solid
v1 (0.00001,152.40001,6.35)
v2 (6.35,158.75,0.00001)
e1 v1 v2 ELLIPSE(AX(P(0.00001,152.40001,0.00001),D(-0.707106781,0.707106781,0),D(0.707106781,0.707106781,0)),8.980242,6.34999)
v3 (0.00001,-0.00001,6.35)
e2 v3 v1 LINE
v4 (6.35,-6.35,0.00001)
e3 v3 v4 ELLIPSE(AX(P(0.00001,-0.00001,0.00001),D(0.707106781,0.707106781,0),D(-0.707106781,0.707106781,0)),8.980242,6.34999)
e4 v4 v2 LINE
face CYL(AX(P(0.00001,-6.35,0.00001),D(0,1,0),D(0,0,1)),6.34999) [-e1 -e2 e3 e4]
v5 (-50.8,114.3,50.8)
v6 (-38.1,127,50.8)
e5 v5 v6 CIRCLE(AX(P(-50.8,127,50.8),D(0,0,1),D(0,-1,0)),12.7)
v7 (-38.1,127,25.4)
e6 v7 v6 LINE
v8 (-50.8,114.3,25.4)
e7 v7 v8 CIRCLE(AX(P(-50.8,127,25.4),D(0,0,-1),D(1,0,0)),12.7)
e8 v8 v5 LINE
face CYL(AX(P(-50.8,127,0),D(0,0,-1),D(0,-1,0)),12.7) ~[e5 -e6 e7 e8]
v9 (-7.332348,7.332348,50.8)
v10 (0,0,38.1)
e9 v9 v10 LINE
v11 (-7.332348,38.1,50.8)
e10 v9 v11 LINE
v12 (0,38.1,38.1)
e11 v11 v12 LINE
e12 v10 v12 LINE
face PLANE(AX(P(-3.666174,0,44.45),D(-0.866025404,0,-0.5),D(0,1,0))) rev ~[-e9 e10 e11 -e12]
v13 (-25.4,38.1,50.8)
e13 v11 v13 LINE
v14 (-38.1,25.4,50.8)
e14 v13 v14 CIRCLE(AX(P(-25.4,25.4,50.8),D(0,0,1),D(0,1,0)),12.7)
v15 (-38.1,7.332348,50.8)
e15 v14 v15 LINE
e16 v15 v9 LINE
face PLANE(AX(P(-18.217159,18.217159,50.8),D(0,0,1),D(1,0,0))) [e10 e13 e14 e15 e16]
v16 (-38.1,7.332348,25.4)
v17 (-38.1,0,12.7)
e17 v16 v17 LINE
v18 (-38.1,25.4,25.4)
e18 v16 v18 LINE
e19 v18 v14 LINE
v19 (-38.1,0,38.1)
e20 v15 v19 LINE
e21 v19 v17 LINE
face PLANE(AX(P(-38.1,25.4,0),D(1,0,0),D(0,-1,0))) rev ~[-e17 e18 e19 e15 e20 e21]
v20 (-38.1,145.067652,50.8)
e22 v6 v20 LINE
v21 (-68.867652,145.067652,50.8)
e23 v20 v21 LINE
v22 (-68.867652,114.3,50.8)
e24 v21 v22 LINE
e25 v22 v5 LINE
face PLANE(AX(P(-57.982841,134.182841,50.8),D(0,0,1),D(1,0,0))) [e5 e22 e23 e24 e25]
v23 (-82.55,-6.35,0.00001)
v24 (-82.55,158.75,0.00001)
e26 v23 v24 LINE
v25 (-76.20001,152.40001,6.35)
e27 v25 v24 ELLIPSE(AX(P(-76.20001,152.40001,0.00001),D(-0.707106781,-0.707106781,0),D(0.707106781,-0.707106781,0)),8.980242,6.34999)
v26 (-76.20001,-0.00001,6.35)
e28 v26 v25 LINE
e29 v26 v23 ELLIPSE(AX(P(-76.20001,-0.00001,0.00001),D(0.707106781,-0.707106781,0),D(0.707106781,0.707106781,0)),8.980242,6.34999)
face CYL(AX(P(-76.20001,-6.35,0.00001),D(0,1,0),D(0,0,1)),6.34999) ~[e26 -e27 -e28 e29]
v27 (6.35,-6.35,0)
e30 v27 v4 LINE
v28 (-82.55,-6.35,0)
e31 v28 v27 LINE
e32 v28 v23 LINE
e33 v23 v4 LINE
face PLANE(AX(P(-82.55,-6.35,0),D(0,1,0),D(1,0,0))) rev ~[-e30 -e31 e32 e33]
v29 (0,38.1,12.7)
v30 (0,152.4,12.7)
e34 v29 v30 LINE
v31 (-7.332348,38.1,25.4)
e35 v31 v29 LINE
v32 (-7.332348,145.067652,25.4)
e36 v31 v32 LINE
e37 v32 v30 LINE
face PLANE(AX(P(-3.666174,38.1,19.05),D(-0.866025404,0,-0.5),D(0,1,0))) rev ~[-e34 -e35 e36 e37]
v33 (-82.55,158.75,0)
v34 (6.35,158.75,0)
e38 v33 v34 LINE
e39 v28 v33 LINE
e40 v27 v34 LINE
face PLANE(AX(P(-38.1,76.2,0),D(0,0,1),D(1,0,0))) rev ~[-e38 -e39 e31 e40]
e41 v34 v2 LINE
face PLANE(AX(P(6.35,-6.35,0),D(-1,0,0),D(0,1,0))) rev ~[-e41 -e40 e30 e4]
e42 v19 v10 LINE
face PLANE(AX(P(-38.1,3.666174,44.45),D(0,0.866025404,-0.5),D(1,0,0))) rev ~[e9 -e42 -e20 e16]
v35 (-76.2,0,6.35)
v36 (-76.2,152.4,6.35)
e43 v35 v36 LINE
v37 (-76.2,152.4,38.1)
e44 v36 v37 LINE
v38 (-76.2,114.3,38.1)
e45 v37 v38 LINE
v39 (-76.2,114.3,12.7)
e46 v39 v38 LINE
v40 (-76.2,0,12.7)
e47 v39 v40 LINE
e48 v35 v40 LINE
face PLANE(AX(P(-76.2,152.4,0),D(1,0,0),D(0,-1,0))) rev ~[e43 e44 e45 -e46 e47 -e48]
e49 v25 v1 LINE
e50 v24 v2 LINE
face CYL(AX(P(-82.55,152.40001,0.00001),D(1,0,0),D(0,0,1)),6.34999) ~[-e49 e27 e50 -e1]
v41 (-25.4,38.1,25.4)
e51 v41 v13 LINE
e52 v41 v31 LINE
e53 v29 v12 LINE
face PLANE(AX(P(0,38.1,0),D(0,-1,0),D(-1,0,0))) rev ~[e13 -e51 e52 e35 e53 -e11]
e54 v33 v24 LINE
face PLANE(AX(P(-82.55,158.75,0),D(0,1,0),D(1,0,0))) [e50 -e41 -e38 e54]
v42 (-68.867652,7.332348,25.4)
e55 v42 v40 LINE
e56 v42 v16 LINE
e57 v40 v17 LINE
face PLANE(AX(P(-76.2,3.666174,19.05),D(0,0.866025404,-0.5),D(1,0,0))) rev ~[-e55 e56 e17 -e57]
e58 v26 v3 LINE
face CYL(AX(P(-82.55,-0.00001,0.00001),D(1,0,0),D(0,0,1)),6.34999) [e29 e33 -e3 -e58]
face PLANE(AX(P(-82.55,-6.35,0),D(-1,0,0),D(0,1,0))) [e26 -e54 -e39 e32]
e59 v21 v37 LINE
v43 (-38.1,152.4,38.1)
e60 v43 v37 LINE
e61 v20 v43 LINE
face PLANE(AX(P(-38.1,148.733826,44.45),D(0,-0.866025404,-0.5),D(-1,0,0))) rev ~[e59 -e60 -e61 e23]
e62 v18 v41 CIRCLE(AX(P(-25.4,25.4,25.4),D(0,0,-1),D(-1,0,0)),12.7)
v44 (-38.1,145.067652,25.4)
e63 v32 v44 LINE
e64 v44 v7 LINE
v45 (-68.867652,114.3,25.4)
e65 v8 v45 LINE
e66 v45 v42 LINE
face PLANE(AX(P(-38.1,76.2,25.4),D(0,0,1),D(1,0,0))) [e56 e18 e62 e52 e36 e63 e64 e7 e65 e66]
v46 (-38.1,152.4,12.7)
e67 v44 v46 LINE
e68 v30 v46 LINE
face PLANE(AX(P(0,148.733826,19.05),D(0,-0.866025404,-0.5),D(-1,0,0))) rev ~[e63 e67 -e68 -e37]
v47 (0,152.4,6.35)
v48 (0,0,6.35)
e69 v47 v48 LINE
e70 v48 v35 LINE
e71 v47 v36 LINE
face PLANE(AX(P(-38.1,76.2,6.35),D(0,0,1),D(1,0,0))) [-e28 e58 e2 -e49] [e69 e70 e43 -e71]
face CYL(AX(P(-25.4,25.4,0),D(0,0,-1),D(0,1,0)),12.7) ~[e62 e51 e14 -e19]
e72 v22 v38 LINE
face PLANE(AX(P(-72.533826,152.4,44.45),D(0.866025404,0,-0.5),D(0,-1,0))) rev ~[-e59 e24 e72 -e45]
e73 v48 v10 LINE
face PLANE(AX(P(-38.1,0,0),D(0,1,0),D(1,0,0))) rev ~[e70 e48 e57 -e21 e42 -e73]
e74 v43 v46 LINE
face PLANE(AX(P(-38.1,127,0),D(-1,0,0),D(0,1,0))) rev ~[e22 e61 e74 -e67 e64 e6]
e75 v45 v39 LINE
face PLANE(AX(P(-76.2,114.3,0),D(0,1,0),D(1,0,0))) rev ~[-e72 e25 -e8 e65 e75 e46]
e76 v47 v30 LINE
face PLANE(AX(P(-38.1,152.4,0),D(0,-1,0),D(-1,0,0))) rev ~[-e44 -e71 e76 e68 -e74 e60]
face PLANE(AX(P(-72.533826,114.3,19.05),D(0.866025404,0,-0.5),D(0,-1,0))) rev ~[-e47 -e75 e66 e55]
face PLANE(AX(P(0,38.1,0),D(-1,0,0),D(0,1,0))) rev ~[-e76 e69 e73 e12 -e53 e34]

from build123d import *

# Parameters (mm, degrees)
F0_W     = 88.9
F0_H     = 165.1
F1_DEPTH = 6.35
F2_DEPTH = 25.4
F3_DEPTH = 50.8
F4_R     = 6.34999
F5_SIZE2 = 12.7
F5_SIZE  = 7.3323484187
F6_SIZE2 = 12.7
F6_SIZE  = 7.3323484187
F7_SIZE2 = 12.7
F7_SIZE  = 7.3323484187


# Not quite as in the source:
# - a fillet or chamfer is up to 0.001 mm smaller than in the source, because OpenCascade refuses the exact size


with BuildPart() as f1:
    # F0 (on Top) → F1 (new body)
    with BuildSketch(Plane.XY):
        with Locations((-38.1, 76.2)):
            Rectangle(F0_W, F0_H)
        Polygon((-76.2, 114.3), (-76.2, 152.4), (-38.1, 152.4), (0, 152.4), (0, 38.1), (0, 0), (-38.1, 0), (-76.2, 0), align=None, mode=Mode.SUBTRACT)
    extrude(amount=F1_DEPTH)

    # F0 (on Top) → F2 (join)
    with BuildSketch(Plane.XY):
        with BuildLine():
            Line((0, 152.4), (-38.1, 152.4))
            Line((-38.1, 152.4), (-38.1, 127))
            ThreePointArc((-38.1, 127), (-41.8197438789, 118.0197438789), (-50.8, 114.3))
            Line((-50.8, 114.3), (-76.2, 114.3))
            Line((-76.2, 114.3), (-76.2, 0))
            Line((-76.2, 0), (-38.1, 0))
            Line((-38.1, 0), (-38.1, 25.4))
            ThreePointArc((-38.1, 25.4), (-34.3802561211, 34.3802561211), (-25.4, 38.1))
            Line((-25.4, 38.1), (0, 38.1))
            Line((0, 38.1), (0, 152.4))
        make_face()
    extrude(amount=F2_DEPTH)

    # F0 (on Top) → F3 (join)
    with BuildSketch(Plane.XY):
        with BuildLine():
            Line((-38.1, 152.4), (-76.2, 152.4))
            Line((-76.2, 152.4), (-76.2, 114.3))
            Line((-76.2, 114.3), (-50.8, 114.3))
            ThreePointArc((-50.8, 114.3), (-41.8197438789, 118.0197438789), (-38.1, 127))
            Line((-38.1, 127), (-38.1, 152.4))
        make_face()
        with BuildLine():
            Line((0, 0), (0, 38.1))
            Line((0, 38.1), (-25.4, 38.1))
            ThreePointArc((-25.4, 38.1), (-34.3802561211, 34.3802561211), (-38.1, 25.4))
            Line((-38.1, 25.4), (-38.1, 0))
            Line((-38.1, 0), (0, 0))
        make_face()
    extrude(amount=F3_DEPTH)

    # F4 (radius 6.35 in the source; OpenCascade refuses exactly that, so slightly less here)
    f4_edges = [f1.edges().sort_by_distance(p)[0] for p in [
        (6.35, 76.2, 6.35),
        (-38.1, 158.75, 6.35),
        (-82.55, 76.2, 6.35),
        (-38.1, -6.35, 6.35),
    ]]
    fillet(f4_edges, radius=F4_R)

    # F5
    f5_edges = [f1.edges().sort_by_distance(p)[0] for p in [
        (0, 95.25, 25.4),
        (-57.15, 0, 25.4),
        (-76.2, 57.15, 25.4),
        (-19.05, 152.4, 25.4),
    ]]
    f5_side = f1.faces().sort_by_distance((-38.1, 76.2, 25.4))[0]
    chamfer(f5_edges, length=F5_SIZE, length2=F5_SIZE2, reference=f5_side)

    # F6
    f6_edges = [f1.edges().sort_by_distance(p)[0] for p in [
        (-57.15, 152.4, 50.8),
        (-76.2, 133.35, 50.8),
    ]]
    f6_side = f1.faces().sort_by_distance((-57.546042, 133.746042, 50.8))[0]
    chamfer(f6_edges, length=F6_SIZE, length2=F6_SIZE2, reference=f6_side)

    # F7
    f7_edges = [f1.edges().sort_by_distance(p)[0] for p in [
        (0, 19.05, 50.8),
        (-19.05, 0, 50.8),
    ]]
    f7_side = f1.faces().sort_by_distance((-18.653958, 18.653958, 50.8))[0]
    chamfer(f7_edges, length=F7_SIZE, length2=F7_SIZE2, reference=f7_side)


solid = f1.part
